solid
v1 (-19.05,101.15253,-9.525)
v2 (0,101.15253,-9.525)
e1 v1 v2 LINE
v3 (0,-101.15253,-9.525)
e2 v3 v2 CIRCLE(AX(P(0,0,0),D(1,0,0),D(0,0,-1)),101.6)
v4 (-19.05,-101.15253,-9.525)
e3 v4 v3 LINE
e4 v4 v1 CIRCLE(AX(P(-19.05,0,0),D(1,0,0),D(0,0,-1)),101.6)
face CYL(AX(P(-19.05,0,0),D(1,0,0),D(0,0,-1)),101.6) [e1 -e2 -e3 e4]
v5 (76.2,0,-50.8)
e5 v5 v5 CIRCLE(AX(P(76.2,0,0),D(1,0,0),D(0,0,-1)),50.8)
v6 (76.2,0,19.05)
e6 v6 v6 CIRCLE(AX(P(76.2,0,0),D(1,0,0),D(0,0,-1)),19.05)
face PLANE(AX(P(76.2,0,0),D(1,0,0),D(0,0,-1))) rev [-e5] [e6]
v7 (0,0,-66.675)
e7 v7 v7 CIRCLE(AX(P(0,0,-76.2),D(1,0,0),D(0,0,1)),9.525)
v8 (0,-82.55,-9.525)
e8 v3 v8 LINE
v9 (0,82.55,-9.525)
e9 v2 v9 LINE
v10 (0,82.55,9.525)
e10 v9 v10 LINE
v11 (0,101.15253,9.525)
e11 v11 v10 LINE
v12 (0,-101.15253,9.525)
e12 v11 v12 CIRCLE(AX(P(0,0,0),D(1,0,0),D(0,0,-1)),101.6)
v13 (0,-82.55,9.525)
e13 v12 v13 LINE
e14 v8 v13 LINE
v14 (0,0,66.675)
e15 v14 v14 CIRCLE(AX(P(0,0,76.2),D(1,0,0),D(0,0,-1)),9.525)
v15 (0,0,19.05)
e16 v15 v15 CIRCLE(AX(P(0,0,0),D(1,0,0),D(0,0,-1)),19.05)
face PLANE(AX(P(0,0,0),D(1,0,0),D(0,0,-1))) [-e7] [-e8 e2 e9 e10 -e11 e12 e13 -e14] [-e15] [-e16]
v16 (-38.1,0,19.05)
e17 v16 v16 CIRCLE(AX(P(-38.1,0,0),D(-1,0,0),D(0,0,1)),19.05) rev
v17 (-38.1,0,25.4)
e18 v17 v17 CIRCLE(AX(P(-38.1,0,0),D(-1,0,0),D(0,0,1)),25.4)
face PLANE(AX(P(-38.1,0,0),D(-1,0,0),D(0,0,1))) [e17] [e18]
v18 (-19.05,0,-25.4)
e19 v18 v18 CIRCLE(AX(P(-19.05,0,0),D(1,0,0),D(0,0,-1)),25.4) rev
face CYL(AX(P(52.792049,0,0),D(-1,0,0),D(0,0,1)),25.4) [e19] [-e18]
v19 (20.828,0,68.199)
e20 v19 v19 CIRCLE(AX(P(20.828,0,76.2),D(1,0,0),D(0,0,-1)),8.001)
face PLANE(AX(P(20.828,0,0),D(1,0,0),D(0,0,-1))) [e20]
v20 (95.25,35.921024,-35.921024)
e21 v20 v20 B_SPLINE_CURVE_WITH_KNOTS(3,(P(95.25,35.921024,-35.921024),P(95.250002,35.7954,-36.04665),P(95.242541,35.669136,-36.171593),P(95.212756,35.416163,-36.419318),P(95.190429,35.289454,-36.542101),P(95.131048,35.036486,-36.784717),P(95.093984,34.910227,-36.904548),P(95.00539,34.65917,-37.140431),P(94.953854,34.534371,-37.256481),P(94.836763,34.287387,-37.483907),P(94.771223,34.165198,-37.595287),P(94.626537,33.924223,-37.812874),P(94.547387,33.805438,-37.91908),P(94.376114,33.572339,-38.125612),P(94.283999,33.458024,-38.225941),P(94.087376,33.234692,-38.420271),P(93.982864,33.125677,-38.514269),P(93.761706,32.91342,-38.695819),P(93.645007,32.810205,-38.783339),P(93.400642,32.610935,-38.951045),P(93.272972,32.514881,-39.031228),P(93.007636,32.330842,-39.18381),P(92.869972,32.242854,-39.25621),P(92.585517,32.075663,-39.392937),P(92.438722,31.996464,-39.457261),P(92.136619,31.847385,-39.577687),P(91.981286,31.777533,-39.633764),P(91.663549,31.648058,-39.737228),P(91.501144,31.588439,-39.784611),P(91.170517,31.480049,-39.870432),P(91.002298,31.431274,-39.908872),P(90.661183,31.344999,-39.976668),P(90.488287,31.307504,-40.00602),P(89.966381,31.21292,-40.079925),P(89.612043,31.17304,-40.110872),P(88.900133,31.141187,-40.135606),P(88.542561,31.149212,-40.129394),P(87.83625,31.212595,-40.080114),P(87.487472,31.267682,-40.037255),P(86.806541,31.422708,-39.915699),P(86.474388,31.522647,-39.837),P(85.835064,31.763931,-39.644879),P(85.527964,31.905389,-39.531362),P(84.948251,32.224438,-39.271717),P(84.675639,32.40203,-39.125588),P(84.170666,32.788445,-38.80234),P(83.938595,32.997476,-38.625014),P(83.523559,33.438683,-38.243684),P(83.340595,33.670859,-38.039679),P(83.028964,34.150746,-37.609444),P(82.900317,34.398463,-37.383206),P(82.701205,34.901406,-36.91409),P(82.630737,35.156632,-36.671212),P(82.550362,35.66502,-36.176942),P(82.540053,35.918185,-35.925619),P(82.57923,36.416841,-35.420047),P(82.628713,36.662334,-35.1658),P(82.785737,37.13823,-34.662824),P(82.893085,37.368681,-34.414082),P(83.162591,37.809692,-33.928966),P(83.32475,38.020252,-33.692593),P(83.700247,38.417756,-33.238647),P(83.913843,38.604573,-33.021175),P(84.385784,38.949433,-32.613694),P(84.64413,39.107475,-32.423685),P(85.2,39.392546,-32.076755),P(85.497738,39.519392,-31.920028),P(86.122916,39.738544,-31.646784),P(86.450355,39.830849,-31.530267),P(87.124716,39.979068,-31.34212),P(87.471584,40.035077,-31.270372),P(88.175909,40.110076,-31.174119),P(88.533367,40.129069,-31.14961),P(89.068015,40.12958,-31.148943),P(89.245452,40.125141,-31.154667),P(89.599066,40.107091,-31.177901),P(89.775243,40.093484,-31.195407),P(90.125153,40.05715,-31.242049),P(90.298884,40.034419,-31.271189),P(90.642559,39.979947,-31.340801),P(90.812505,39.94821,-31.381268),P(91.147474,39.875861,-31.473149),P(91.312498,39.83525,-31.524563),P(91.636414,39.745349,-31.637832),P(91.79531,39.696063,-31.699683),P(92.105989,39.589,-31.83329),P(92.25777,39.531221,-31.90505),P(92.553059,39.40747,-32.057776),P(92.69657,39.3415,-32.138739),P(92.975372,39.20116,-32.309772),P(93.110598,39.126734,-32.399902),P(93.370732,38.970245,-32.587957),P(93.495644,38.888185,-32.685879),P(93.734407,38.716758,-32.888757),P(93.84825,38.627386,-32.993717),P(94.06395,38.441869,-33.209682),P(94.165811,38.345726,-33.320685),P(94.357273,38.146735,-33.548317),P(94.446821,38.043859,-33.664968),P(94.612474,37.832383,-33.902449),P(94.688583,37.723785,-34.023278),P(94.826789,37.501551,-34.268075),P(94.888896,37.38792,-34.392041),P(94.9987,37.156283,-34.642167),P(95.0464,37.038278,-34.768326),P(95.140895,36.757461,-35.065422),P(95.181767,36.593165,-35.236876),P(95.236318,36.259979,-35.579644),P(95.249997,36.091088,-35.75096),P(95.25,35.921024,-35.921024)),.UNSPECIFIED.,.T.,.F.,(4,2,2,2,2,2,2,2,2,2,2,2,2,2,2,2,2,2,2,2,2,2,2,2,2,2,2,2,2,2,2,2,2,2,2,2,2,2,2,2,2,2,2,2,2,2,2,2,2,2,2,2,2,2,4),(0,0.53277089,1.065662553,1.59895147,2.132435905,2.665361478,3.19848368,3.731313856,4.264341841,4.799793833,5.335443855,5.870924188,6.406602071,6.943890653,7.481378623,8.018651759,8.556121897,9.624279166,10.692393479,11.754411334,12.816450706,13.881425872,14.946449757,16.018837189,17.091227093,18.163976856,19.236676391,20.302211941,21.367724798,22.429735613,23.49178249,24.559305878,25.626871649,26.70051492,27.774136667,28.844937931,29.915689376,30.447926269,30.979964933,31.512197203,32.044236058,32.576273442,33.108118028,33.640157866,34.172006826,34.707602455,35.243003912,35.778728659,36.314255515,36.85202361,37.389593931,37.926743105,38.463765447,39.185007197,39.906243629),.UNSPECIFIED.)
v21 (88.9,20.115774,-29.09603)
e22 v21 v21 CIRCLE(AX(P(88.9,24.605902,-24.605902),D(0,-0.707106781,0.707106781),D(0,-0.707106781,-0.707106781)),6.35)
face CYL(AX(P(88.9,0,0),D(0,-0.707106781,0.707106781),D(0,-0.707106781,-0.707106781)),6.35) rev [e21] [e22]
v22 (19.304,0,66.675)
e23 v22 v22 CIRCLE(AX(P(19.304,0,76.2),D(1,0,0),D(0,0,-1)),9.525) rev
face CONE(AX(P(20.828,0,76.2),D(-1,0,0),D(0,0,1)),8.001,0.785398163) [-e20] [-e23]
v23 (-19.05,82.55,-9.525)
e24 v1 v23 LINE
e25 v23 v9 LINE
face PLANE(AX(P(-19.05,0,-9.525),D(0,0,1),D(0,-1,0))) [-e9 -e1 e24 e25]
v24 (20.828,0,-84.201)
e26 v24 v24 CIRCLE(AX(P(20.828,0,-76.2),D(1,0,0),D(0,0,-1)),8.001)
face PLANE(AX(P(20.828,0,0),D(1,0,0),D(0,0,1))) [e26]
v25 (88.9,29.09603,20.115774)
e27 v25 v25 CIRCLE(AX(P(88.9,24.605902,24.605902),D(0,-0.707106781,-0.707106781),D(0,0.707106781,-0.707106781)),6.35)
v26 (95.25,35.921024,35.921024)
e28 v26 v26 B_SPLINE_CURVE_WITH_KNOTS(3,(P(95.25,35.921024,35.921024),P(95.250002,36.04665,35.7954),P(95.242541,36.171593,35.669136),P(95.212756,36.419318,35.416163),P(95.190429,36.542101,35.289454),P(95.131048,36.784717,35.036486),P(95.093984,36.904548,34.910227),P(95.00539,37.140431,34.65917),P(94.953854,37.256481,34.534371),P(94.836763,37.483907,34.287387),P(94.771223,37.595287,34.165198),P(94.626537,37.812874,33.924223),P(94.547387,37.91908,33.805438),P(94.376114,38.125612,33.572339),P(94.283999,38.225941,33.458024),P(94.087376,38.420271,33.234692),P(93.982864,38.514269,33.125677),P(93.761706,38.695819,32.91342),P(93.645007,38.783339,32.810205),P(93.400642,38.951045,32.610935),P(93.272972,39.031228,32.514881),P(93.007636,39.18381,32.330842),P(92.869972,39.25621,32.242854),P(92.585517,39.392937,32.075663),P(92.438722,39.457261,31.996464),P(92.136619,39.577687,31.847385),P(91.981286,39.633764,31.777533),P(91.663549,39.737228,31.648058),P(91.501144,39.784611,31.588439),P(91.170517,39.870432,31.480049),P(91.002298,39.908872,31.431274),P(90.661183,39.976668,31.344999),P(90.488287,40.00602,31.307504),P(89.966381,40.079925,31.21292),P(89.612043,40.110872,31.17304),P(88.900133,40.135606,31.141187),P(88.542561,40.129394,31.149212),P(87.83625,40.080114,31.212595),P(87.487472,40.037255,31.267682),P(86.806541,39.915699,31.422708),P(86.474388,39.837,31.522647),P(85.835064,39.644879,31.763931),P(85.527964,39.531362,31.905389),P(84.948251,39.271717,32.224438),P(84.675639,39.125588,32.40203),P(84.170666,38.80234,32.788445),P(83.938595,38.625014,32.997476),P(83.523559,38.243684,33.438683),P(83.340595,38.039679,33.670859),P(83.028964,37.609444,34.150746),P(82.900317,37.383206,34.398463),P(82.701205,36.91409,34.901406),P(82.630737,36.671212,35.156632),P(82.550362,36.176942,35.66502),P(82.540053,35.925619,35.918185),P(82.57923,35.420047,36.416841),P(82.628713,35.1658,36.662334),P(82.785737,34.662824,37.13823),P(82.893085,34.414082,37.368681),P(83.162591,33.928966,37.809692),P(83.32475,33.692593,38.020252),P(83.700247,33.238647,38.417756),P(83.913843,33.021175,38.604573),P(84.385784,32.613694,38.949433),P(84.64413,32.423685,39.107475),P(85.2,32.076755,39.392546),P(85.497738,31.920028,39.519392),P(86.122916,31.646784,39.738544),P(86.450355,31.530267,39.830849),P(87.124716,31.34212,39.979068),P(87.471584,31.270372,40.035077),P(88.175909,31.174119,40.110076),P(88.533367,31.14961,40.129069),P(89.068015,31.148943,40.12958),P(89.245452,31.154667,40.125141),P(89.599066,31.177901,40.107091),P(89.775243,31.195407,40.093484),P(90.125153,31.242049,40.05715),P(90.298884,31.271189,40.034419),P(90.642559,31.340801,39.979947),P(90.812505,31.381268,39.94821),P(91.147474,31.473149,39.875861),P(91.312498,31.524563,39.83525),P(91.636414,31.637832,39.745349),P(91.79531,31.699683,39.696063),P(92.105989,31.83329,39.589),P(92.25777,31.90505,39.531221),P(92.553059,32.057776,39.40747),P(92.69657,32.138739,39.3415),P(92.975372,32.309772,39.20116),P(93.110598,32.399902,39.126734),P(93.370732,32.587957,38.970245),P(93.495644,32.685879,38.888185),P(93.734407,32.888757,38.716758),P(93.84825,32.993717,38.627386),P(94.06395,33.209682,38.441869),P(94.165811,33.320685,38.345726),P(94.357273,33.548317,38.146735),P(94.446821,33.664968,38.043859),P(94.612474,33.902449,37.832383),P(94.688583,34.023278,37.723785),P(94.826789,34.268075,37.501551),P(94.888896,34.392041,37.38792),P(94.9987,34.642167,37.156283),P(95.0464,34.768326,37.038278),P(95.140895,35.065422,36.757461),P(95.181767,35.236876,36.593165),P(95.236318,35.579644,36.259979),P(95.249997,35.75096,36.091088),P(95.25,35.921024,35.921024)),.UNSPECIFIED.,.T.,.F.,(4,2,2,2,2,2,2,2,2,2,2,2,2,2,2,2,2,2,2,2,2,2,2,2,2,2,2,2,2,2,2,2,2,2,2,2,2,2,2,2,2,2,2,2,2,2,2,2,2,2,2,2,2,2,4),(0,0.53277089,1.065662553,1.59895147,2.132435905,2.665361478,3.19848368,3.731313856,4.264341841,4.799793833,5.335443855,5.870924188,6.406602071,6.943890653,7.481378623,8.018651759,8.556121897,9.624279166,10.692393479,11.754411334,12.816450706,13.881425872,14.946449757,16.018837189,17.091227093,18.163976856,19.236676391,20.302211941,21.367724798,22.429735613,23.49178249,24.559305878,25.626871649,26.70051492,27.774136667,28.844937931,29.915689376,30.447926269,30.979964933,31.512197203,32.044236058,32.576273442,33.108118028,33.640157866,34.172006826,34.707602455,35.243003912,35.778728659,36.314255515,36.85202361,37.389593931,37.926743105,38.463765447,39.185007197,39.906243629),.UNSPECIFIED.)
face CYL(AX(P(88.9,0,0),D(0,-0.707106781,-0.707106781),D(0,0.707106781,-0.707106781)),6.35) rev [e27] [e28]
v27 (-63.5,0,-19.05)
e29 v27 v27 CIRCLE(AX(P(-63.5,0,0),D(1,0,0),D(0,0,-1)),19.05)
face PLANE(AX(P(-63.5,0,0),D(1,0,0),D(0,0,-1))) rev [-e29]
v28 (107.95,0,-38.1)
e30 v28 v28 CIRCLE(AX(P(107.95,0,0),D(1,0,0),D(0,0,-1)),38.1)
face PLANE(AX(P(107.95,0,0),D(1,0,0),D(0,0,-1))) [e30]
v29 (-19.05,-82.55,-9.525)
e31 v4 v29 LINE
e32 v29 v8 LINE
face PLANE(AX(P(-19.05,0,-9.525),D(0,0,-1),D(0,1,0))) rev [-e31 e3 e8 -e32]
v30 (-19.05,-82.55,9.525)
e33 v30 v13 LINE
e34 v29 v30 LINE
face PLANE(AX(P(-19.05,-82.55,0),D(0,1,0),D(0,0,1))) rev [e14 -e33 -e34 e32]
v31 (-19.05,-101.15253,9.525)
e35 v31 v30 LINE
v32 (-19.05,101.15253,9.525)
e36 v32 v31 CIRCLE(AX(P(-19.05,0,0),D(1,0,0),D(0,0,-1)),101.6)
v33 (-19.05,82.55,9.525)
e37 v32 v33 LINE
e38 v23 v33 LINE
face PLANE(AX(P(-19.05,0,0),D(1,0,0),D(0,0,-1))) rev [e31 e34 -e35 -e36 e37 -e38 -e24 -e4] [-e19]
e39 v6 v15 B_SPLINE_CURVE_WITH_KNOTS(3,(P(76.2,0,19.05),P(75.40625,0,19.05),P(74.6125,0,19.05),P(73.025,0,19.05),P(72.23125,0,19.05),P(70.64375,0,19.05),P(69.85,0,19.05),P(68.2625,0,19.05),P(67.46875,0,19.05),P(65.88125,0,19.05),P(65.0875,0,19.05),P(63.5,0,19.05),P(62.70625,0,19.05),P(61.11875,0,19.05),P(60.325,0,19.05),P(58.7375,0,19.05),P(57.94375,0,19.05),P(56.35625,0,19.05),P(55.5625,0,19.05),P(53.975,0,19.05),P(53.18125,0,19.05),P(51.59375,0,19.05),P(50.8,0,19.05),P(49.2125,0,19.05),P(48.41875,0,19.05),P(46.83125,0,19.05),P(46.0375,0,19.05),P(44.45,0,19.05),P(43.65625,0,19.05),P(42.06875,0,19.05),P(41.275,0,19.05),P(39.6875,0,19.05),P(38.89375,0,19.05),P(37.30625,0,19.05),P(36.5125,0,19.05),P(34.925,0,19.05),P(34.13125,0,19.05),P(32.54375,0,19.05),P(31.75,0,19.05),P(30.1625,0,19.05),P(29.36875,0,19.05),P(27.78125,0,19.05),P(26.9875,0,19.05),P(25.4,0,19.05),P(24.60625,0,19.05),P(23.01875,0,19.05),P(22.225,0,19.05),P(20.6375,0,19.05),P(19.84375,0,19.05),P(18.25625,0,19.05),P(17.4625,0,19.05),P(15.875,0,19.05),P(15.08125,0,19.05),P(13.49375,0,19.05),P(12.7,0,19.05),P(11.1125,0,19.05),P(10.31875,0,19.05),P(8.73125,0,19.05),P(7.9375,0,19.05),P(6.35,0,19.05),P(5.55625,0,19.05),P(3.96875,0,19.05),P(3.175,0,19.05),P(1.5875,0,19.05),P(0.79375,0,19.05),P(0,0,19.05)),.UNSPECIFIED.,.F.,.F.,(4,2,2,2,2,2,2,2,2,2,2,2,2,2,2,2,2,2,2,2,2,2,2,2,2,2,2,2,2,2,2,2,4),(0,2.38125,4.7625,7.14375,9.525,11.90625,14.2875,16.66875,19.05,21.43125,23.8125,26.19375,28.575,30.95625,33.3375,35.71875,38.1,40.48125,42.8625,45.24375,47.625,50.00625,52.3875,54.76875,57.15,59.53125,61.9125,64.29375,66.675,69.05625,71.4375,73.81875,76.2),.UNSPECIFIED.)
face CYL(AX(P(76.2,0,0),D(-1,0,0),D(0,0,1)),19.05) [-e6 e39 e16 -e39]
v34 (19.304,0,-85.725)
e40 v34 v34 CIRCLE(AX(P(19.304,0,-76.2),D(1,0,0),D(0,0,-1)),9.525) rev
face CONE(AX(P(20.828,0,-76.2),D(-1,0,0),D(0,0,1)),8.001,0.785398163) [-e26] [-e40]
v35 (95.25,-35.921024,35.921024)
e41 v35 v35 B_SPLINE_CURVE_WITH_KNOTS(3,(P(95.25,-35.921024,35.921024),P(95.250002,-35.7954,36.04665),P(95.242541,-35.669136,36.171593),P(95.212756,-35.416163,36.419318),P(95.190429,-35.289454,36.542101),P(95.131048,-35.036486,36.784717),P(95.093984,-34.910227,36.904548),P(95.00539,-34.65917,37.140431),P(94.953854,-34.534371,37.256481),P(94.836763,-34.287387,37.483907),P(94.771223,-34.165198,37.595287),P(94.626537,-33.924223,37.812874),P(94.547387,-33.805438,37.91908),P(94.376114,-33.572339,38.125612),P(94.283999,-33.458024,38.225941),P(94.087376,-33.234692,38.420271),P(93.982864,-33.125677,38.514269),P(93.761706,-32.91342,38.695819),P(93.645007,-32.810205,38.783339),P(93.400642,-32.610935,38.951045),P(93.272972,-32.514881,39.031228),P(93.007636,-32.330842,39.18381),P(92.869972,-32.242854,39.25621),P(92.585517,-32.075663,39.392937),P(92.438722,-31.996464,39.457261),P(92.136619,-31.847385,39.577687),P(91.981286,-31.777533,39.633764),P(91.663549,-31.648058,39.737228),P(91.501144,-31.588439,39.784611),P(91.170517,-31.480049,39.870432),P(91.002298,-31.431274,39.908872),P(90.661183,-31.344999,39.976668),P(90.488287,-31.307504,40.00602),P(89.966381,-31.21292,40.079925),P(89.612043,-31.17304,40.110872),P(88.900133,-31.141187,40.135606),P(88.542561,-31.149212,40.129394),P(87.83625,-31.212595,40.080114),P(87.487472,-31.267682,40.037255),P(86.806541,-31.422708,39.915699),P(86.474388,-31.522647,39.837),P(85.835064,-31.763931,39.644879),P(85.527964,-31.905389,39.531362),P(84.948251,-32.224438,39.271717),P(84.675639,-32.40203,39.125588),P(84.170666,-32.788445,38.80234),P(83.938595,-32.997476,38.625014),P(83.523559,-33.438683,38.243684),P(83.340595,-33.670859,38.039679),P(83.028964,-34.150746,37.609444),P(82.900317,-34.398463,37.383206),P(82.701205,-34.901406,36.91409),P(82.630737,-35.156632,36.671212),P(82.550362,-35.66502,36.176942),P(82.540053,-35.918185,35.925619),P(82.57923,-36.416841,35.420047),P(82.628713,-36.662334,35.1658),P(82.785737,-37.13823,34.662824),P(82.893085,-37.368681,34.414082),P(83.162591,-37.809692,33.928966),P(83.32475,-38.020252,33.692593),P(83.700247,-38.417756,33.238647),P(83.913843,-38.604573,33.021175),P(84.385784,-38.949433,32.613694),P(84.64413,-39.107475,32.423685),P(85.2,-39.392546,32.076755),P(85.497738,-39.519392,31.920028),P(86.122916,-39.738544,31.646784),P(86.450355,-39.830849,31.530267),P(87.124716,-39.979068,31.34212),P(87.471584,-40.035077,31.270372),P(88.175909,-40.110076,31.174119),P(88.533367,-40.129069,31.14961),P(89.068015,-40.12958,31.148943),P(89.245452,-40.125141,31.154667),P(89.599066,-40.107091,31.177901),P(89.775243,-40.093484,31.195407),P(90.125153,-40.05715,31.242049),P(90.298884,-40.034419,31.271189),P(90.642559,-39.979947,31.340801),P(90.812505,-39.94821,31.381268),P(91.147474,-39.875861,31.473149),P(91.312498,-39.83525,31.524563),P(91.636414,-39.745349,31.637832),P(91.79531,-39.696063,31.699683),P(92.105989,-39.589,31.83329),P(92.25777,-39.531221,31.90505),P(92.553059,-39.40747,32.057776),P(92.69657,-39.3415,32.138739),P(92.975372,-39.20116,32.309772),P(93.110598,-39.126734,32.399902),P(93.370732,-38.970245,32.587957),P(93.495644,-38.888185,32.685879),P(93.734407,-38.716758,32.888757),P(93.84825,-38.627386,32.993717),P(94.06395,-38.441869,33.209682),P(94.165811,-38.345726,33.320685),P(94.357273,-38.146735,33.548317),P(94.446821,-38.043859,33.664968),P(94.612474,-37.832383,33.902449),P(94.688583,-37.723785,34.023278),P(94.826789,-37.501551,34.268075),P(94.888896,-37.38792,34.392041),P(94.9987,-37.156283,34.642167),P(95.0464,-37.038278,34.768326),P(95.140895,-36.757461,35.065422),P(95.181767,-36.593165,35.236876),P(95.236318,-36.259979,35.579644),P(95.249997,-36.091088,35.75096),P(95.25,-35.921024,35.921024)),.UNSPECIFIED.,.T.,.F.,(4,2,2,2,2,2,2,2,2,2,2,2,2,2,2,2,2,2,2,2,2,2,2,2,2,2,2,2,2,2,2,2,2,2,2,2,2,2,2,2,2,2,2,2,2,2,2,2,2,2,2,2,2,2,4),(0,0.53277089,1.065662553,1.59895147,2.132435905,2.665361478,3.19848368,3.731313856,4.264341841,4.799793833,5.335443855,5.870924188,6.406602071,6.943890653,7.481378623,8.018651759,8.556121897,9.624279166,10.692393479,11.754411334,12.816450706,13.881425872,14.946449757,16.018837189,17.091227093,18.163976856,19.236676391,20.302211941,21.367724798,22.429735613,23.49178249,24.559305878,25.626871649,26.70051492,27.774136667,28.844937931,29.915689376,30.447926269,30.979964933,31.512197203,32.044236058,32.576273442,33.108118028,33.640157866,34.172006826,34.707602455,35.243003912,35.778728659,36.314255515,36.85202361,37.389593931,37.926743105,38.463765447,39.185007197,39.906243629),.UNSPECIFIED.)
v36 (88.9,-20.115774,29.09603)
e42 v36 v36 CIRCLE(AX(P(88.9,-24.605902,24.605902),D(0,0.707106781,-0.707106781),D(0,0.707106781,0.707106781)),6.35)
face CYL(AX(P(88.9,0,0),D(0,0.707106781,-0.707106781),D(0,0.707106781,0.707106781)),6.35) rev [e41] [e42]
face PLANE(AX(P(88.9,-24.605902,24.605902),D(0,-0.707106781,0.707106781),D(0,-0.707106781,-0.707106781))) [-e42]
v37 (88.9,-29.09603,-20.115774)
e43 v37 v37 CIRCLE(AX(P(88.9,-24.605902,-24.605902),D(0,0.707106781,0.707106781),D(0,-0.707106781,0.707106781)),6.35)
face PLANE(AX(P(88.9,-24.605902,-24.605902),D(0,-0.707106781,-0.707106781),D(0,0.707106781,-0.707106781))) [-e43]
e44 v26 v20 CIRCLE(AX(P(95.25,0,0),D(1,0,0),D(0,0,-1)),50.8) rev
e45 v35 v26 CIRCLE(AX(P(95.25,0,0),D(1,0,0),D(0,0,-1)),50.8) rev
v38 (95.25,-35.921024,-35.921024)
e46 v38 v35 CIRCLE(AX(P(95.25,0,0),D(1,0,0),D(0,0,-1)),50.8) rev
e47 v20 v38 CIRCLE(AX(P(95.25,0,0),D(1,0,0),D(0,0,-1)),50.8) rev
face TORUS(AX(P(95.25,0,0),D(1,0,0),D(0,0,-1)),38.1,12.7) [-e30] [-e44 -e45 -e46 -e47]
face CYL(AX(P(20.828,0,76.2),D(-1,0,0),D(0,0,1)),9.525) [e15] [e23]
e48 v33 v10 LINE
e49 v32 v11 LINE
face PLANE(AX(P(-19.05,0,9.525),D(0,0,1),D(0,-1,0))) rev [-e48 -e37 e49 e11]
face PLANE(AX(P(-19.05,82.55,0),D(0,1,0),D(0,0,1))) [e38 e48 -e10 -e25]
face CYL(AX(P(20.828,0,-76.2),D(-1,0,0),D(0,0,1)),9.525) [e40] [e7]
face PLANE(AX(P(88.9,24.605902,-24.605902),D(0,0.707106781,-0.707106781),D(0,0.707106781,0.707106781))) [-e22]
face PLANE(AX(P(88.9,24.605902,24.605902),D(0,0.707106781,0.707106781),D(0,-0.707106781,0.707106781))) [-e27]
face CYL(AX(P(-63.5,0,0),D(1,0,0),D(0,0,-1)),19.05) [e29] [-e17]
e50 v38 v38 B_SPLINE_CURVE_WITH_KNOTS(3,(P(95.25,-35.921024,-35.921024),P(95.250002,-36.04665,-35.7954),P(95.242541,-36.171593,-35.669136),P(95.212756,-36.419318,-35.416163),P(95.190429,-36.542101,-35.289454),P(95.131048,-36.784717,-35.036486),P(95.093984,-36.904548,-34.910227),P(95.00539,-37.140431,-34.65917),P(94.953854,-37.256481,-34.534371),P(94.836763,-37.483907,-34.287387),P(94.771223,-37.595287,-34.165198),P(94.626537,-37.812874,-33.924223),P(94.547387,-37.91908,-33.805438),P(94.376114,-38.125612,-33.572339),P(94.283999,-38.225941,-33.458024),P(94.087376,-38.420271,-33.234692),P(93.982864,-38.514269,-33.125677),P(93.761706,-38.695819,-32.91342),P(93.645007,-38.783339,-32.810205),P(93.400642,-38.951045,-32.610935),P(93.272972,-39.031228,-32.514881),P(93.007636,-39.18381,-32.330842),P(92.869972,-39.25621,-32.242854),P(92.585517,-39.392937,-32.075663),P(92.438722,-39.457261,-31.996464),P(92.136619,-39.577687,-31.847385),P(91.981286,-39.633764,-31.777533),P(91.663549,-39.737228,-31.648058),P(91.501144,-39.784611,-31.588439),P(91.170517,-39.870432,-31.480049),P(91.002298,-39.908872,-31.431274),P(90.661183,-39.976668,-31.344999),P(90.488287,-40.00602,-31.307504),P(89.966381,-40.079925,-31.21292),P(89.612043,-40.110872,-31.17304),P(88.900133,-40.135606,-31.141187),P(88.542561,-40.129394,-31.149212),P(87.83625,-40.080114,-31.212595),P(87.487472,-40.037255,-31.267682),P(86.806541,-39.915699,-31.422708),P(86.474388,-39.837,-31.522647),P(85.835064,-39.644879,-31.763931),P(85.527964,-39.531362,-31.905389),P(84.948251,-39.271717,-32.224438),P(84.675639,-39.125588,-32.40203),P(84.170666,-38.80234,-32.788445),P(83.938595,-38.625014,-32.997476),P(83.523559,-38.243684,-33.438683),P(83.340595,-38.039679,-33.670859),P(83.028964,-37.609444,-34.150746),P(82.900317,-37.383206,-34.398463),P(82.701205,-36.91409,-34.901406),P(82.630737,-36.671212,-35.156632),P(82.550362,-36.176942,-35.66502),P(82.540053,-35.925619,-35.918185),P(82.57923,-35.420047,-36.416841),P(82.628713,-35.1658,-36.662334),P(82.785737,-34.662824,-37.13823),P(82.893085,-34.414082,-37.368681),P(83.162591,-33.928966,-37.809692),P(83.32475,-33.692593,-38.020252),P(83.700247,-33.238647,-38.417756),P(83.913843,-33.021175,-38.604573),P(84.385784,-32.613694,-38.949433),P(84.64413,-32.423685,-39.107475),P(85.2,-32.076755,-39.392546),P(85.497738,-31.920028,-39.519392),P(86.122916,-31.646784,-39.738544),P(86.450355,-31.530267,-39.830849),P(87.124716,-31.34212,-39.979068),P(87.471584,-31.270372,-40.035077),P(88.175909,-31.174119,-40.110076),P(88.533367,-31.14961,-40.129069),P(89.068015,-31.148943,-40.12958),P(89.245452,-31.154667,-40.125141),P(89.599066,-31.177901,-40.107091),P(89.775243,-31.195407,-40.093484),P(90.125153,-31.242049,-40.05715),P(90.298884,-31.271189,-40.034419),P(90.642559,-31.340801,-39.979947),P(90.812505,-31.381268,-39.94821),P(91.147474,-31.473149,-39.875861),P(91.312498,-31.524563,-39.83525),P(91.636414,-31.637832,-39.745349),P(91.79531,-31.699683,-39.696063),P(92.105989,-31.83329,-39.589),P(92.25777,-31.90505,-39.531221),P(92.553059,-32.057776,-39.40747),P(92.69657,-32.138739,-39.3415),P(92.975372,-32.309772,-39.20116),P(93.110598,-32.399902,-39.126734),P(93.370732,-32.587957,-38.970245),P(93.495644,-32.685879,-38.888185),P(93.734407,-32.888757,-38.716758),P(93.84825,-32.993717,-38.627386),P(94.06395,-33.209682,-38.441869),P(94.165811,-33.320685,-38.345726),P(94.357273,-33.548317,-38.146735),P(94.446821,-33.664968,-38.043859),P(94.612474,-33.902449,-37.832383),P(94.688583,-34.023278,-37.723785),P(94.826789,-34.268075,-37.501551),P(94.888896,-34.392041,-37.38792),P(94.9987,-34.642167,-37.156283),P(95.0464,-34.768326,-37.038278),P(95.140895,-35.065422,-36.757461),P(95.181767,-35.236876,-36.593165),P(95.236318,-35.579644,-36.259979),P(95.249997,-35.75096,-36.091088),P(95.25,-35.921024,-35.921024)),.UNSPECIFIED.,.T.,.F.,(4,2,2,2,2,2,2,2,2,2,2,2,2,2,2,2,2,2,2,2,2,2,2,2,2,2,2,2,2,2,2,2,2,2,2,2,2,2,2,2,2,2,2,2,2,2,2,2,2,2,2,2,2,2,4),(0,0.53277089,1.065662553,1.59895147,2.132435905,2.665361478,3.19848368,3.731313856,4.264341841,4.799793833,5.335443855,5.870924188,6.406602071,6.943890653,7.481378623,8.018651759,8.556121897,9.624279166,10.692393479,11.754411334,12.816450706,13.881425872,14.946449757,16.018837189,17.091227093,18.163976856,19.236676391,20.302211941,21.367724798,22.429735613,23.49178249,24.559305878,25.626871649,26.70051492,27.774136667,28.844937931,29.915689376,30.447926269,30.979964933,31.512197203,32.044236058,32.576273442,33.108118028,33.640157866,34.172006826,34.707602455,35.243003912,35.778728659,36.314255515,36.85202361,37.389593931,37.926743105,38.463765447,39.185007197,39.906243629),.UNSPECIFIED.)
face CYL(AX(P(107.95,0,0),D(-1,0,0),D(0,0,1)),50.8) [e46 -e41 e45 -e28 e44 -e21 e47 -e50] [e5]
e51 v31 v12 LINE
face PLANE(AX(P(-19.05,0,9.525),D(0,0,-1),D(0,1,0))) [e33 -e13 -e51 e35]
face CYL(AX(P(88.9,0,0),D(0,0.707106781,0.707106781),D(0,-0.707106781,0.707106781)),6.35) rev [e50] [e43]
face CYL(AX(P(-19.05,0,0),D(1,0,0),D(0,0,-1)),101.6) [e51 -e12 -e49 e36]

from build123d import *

# Parameters (mm, degrees)
BOSS_EXTRUDE1_DEPTH          = 19.05
SKETCH1_3_R                  = 9.525
BOSS_EXTRUDE2_DEPTH          = 20.828
CHAMFER1_SIZE                = 1.524
BOSS_EXTRUDE3_START          = -19.05
SKETCH1_4_R                  = 19.05
BOSS_EXTRUDE3_DEPTH          = 44.45
BOSS_EXTRUDE4_START          = -19.05
SKETCH1_6_R                  = 25.4
SKETCH1_6_R_2                = 19.05
BOSS_EXTRUDE4_DEPTH          = 19.05
BOSS_EXTRUDE5_START          = 76.2
SKETCH1_7_R                  = 19.05
BOSS_EXTRUDE5_DEPTH          = 76.2
BOSS_EXTRUDE6_START          = 107.95
SKETCH1_8_R                  = 50.8
SKETCH1_8_R_2                = 25.4
SKETCH1_8_R_3                = 19.05
BOSS_EXTRUDE6_DEPTH          = 31.75
CIRPATTERN2_COUNT            = 2
CHAMFER1_OF_CIRPATTERN2_SIZE = 1.524
FILLET1_R                    = 12.7
CUT_REVOLVE1_START           = 34.798
CUT_REVOLVE1_OUTLINE_R       = 6.35
CUT_REVOLVE1_DEPTH           = 16.0020001
CIRPATTERN3_COUNT            = 4


# Read off the part's stored shape, not the designer's step: Cut-Revolve1
with BuildPart() as part:
    # Sketch1 → Boss-Extrude1 (new body)
    with BuildSketch(Plane.YZ):
        with BuildLine():
            ThreePointArc((-101.152530245, -9.525), (0, -101.6), (101.152530245, -9.525))
            Line((101.152530245, -9.525), (82.55, -9.525))
            Line((82.55, -9.525), (82.55, 9.525))
            Line((82.55, 9.525), (101.152530245, 9.525))
            ThreePointArc((101.152530245, 9.525), (0, 101.6), (-101.152530245, 9.525))
            Line((-101.152530245, 9.525), (-82.55, 9.525))
            Line((-82.55, 9.525), (-82.55, -9.525))
            Line((-82.55, -9.525), (-101.152530245, -9.525))
        make_face()
    extrude(amount=-BOSS_EXTRUDE1_DEPTH)

    # Sketch1<3> → Boss-Extrude2 (add)
    with BuildSketch(Plane.YZ):
        with Locations(Location((0, 76.2, 0), (0, 0, 270))):
            Circle(SKETCH1_3_R)
    boss_extrude2 = extrude(amount=BOSS_EXTRUDE2_DEPTH)

    # Chamfer1
    chamfer1_edges = [part.edges().sort_by_distance(p)[0] for p in [
        (20.828, 0, 85.725),
    ]]
    chamfer(chamfer1_edges, length=CHAMFER1_SIZE)

    # Sketch1<4> → Boss-Extrude3 (add)
    with BuildSketch(Plane.YZ.offset(BOSS_EXTRUDE3_START)):
        with Locations(Location((0, 0, 0), (0, 0, 270))):
            Circle(SKETCH1_4_R)
    extrude(amount=-BOSS_EXTRUDE3_DEPTH)

    # Sketch1<6> → Boss-Extrude4 (add)
    with BuildSketch(Plane.YZ.offset(BOSS_EXTRUDE4_START)):
        with Locations(Location((0, 0, 0), (0, 0, 90))):
            Circle(SKETCH1_6_R)
        with Locations(Location((0, 0, 0), (0, 0, 270))):
            Circle(SKETCH1_6_R_2, mode=Mode.SUBTRACT)
    extrude(amount=-BOSS_EXTRUDE4_DEPTH)

    # Sketch1<7> → Boss-Extrude5 (add)
    with BuildSketch(Plane.YZ.offset(BOSS_EXTRUDE5_START)):
        with Locations(Location((0, 0, 0), (0, 0, 270))):
            Circle(SKETCH1_7_R)
    extrude(amount=-BOSS_EXTRUDE5_DEPTH)

    # Sketch1<8> → Boss-Extrude6 (add)
    # profile 1 of 3: a face of its own
    with BuildSketch(Plane.YZ.offset(BOSS_EXTRUDE6_START)):
        with Locations(Location((0, 0, 0), (0, 0, 270))):
            Circle(SKETCH1_8_R)
        with Locations(Location((0, 0, 0), (0, 0, 90))):
            Circle(SKETCH1_8_R_2, mode=Mode.SUBTRACT)
    # profile 2 of 3: a face of its own
    with BuildSketch(Plane.YZ.offset(BOSS_EXTRUDE6_START)):
        with Locations(Location((0, 0, 0), (0, 0, 90))):
            Circle(SKETCH1_8_R_2)
        with Locations(Location((0, 0, 0), (0, 0, 270))):
            Circle(SKETCH1_8_R_3, mode=Mode.SUBTRACT)
    # profile 3 of 3: a face of its own
    with BuildSketch(Plane.YZ.offset(BOSS_EXTRUDE6_START)):
        with Locations(Location((0, 0, 0), (0, 0, 270))):
            Circle(SKETCH1_8_R_3)
    extrude(amount=-BOSS_EXTRUDE6_DEPTH)

    # CirPattern2: Boss-Extrude2 ×2 about axis
    cirpattern2_axis = Axis((0, 0, 0), (1, 0, 0))
    for i in range(1, CIRPATTERN2_COUNT):
        add(boss_extrude2.rotate(cirpattern2_axis, i * 360 / CIRPATTERN2_COUNT))

    # Chamfer1 of CirPattern2
    chamfer1_of_cirpattern2_edges = [part.edges().sort_by_distance(p)[0] for p in [
        (20.828, 0, -85.725),
    ]]
    chamfer(chamfer1_of_cirpattern2_edges, length=CHAMFER1_OF_CIRPATTERN2_SIZE)

    # Fillet1
    fillet1_edges = [part.edges().sort_by_distance(p)[0] for p in [
        (107.95, 0, 50.8),
    ]]
    fillet(fillet1_edges, radius=FILLET1_R)

    # Cut-Revolve1 outline → Cut-Revolve1 (cut)
    with BuildSketch(Plane(origin=(0, 0, 0), x_dir=(1, 0, 0), z_dir=(0, 0.707106781186549, -0.707106781186546)).offset(CUT_REVOLVE1_START)):
        with Locations((88.9, 0)):
            Circle(CUT_REVOLVE1_OUTLINE_R)
    cut_revolve1 = extrude(amount=CUT_REVOLVE1_DEPTH, mode=Mode.SUBTRACT)

    # CirPattern3: Cut-Revolve1 ×4 about axis
    cirpattern3_axis = Axis((0, 0, 0), (1, 0, 0))
    for i in range(1, CIRPATTERN3_COUNT):
        add(cut_revolve1.rotate(cirpattern3_axis, i * 360 / CIRPATTERN3_COUNT), mode=Mode.SUBTRACT)


solid = part.part
